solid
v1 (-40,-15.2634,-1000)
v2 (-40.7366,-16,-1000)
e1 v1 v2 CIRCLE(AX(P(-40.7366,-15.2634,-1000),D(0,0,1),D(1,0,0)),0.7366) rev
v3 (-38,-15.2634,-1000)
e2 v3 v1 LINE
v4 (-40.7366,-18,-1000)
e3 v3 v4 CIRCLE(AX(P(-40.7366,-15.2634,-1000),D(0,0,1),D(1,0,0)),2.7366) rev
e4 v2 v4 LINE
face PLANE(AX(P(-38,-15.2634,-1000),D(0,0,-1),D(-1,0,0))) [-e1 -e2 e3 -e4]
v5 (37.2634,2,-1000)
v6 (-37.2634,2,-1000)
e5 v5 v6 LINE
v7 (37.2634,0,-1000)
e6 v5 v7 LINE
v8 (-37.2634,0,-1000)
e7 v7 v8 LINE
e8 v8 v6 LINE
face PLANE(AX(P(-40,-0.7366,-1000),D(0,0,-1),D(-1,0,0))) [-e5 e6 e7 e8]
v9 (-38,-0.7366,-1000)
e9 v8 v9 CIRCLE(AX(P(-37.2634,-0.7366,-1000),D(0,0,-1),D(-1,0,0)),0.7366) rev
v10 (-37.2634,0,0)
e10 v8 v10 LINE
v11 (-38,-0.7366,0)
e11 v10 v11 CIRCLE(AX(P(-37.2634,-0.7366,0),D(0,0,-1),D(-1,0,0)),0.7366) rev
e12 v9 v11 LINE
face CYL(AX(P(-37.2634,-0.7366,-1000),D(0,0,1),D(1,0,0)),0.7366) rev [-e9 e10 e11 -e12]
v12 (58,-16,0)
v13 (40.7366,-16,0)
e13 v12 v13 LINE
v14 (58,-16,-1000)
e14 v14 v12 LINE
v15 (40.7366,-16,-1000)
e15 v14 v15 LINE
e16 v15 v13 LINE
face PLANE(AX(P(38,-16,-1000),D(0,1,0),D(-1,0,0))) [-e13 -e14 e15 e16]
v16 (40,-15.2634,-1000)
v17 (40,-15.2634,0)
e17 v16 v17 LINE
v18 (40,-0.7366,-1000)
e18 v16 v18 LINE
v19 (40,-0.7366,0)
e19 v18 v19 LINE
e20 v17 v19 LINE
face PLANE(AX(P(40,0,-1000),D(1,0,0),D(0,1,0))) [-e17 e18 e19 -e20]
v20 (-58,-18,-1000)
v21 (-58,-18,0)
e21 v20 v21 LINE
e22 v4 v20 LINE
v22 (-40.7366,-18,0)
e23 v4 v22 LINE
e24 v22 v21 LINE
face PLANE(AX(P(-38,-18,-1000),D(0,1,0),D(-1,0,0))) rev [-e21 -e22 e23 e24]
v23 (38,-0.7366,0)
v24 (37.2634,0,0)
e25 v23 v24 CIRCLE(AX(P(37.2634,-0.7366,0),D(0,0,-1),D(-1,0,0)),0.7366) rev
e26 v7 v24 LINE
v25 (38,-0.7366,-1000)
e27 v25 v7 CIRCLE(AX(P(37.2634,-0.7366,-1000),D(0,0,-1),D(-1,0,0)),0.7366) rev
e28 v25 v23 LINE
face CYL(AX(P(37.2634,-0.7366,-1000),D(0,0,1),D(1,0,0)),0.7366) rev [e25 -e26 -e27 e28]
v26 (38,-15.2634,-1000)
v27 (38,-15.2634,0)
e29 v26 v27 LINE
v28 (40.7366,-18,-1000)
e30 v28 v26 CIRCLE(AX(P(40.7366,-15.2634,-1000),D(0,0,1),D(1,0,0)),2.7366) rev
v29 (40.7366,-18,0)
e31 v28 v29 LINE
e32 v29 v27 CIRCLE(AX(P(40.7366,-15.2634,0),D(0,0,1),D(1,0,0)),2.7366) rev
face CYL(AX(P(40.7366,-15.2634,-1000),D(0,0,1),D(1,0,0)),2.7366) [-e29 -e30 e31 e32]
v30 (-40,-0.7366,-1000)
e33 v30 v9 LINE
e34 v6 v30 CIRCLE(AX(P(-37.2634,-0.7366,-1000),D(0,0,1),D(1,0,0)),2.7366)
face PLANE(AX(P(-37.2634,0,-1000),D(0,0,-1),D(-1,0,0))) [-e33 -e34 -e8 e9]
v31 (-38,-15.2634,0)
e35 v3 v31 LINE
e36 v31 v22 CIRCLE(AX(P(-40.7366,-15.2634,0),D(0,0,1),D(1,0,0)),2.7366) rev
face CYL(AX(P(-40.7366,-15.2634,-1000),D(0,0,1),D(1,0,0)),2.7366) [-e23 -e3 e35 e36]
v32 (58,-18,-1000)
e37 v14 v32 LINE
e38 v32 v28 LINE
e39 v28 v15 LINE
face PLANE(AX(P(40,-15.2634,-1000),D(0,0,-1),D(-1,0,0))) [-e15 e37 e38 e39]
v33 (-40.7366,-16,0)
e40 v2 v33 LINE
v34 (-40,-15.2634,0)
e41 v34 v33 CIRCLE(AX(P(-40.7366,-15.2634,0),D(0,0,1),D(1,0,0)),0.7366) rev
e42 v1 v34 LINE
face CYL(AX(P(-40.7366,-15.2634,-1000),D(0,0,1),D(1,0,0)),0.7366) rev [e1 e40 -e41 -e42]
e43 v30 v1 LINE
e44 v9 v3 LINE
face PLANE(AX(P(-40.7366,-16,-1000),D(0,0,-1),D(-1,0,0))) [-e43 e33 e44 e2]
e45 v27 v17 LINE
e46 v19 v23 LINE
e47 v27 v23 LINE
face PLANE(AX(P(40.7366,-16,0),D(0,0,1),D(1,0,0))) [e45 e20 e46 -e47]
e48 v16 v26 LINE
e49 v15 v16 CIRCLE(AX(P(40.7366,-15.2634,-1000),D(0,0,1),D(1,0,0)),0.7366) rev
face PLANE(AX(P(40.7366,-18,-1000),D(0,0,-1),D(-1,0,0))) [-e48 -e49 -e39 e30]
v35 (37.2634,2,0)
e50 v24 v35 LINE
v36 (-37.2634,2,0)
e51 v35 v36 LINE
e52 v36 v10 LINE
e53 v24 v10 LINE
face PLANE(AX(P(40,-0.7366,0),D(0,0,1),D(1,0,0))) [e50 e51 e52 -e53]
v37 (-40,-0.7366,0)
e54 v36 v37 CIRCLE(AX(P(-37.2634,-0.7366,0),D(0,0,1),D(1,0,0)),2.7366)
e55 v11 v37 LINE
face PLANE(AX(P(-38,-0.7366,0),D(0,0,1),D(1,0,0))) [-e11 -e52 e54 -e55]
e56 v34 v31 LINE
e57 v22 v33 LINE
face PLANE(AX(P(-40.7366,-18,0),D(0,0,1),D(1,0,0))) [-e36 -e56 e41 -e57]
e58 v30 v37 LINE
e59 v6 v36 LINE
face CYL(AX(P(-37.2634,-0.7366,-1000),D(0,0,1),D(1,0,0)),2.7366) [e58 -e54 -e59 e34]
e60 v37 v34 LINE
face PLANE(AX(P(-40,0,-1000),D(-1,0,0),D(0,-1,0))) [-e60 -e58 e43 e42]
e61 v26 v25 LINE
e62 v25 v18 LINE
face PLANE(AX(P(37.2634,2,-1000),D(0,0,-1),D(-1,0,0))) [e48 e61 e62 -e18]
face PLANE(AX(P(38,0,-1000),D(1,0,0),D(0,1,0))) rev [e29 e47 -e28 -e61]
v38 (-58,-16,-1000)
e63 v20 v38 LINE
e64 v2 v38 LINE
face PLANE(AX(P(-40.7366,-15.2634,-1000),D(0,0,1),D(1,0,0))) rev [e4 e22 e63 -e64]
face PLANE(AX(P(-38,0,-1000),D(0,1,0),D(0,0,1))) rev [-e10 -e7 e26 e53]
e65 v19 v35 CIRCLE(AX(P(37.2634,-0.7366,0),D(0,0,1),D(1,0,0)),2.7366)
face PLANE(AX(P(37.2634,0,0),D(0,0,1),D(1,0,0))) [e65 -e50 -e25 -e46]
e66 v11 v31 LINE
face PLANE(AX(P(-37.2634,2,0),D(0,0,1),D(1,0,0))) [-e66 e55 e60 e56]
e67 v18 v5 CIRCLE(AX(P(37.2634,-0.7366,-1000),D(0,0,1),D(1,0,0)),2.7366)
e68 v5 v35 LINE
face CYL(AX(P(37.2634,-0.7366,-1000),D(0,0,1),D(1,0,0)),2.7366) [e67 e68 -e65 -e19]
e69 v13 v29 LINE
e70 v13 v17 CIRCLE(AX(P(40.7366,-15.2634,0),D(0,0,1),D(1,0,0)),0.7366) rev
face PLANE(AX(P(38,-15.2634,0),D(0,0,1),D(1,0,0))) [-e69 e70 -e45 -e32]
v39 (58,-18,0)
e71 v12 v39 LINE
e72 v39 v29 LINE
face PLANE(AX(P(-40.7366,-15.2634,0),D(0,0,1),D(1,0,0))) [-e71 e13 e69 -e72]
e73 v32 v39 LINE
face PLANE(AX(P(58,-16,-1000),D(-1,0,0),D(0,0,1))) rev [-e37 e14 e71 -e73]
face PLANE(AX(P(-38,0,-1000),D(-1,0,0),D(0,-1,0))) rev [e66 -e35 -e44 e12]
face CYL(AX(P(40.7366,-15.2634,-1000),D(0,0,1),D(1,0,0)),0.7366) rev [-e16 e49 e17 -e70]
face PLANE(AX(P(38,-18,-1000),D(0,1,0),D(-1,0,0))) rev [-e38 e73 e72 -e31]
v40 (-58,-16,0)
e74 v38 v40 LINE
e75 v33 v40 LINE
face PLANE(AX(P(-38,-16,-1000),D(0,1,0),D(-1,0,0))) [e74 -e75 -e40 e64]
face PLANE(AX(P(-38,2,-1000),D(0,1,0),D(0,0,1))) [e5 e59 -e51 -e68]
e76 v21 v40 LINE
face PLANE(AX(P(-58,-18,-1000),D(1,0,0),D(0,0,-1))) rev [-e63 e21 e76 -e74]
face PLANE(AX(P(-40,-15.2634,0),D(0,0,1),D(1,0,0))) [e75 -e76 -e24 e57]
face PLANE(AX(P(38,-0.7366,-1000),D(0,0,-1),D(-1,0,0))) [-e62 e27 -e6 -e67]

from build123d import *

# Parameters (mm, degrees)
BASE_DEPTH = 1000


# Sheet-metal steps are written as plain solids
with BuildPart() as part:
    # Sketch1 → Base (new body)
    with BuildSketch(Plane.XY):
        with BuildLine():
            Line((-58, -18), (-40.7366, -18))
            ThreePointArc((-40.7366, -18), (-38.801531583, -17.198468417), (-38, -15.2634))
            Line((-38, -15.2634), (-38, -0.7366))
            ThreePointArc((-38, -0.7366), (-37.784254855, -0.215745145), (-37.2634, 0))
            Line((-37.2634, 0), (37.2634, 0))
            ThreePointArc((37.2634, 0), (37.784254855, -0.215745145), (38, -0.7366))
            Line((38, -0.7366), (38, -15.2634))
            ThreePointArc((38, -15.2634), (38.801531583, -17.198468417), (40.7366, -18))
            Line((40.7366, -18), (58, -18))
            Line((58, -18), (58, -16))
            Line((58, -16), (40.7366, -16))
            ThreePointArc((40.7366, -16), (40.215745145, -15.784254855), (40, -15.2634))
            Line((40, -15.2634), (40, -0.7366))
            ThreePointArc((40, -0.7366), (39.198468417, 1.198468417), (37.2634, 2))
            Line((37.2634, 2), (-37.2634, 2))
            ThreePointArc((-37.2634, 2), (-39.198468417, 1.198468417), (-40, -0.7366))
            Line((-40, -0.7366), (-40, -15.2634))
            ThreePointArc((-40, -15.2634), (-40.215745145, -15.784254855), (-40.7366, -16))
            Line((-40.7366, -16), (-58, -16))
            Line((-58, -16), (-58, -18))
        make_face()
    extrude(amount=-BASE_DEPTH)


solid = part.part
